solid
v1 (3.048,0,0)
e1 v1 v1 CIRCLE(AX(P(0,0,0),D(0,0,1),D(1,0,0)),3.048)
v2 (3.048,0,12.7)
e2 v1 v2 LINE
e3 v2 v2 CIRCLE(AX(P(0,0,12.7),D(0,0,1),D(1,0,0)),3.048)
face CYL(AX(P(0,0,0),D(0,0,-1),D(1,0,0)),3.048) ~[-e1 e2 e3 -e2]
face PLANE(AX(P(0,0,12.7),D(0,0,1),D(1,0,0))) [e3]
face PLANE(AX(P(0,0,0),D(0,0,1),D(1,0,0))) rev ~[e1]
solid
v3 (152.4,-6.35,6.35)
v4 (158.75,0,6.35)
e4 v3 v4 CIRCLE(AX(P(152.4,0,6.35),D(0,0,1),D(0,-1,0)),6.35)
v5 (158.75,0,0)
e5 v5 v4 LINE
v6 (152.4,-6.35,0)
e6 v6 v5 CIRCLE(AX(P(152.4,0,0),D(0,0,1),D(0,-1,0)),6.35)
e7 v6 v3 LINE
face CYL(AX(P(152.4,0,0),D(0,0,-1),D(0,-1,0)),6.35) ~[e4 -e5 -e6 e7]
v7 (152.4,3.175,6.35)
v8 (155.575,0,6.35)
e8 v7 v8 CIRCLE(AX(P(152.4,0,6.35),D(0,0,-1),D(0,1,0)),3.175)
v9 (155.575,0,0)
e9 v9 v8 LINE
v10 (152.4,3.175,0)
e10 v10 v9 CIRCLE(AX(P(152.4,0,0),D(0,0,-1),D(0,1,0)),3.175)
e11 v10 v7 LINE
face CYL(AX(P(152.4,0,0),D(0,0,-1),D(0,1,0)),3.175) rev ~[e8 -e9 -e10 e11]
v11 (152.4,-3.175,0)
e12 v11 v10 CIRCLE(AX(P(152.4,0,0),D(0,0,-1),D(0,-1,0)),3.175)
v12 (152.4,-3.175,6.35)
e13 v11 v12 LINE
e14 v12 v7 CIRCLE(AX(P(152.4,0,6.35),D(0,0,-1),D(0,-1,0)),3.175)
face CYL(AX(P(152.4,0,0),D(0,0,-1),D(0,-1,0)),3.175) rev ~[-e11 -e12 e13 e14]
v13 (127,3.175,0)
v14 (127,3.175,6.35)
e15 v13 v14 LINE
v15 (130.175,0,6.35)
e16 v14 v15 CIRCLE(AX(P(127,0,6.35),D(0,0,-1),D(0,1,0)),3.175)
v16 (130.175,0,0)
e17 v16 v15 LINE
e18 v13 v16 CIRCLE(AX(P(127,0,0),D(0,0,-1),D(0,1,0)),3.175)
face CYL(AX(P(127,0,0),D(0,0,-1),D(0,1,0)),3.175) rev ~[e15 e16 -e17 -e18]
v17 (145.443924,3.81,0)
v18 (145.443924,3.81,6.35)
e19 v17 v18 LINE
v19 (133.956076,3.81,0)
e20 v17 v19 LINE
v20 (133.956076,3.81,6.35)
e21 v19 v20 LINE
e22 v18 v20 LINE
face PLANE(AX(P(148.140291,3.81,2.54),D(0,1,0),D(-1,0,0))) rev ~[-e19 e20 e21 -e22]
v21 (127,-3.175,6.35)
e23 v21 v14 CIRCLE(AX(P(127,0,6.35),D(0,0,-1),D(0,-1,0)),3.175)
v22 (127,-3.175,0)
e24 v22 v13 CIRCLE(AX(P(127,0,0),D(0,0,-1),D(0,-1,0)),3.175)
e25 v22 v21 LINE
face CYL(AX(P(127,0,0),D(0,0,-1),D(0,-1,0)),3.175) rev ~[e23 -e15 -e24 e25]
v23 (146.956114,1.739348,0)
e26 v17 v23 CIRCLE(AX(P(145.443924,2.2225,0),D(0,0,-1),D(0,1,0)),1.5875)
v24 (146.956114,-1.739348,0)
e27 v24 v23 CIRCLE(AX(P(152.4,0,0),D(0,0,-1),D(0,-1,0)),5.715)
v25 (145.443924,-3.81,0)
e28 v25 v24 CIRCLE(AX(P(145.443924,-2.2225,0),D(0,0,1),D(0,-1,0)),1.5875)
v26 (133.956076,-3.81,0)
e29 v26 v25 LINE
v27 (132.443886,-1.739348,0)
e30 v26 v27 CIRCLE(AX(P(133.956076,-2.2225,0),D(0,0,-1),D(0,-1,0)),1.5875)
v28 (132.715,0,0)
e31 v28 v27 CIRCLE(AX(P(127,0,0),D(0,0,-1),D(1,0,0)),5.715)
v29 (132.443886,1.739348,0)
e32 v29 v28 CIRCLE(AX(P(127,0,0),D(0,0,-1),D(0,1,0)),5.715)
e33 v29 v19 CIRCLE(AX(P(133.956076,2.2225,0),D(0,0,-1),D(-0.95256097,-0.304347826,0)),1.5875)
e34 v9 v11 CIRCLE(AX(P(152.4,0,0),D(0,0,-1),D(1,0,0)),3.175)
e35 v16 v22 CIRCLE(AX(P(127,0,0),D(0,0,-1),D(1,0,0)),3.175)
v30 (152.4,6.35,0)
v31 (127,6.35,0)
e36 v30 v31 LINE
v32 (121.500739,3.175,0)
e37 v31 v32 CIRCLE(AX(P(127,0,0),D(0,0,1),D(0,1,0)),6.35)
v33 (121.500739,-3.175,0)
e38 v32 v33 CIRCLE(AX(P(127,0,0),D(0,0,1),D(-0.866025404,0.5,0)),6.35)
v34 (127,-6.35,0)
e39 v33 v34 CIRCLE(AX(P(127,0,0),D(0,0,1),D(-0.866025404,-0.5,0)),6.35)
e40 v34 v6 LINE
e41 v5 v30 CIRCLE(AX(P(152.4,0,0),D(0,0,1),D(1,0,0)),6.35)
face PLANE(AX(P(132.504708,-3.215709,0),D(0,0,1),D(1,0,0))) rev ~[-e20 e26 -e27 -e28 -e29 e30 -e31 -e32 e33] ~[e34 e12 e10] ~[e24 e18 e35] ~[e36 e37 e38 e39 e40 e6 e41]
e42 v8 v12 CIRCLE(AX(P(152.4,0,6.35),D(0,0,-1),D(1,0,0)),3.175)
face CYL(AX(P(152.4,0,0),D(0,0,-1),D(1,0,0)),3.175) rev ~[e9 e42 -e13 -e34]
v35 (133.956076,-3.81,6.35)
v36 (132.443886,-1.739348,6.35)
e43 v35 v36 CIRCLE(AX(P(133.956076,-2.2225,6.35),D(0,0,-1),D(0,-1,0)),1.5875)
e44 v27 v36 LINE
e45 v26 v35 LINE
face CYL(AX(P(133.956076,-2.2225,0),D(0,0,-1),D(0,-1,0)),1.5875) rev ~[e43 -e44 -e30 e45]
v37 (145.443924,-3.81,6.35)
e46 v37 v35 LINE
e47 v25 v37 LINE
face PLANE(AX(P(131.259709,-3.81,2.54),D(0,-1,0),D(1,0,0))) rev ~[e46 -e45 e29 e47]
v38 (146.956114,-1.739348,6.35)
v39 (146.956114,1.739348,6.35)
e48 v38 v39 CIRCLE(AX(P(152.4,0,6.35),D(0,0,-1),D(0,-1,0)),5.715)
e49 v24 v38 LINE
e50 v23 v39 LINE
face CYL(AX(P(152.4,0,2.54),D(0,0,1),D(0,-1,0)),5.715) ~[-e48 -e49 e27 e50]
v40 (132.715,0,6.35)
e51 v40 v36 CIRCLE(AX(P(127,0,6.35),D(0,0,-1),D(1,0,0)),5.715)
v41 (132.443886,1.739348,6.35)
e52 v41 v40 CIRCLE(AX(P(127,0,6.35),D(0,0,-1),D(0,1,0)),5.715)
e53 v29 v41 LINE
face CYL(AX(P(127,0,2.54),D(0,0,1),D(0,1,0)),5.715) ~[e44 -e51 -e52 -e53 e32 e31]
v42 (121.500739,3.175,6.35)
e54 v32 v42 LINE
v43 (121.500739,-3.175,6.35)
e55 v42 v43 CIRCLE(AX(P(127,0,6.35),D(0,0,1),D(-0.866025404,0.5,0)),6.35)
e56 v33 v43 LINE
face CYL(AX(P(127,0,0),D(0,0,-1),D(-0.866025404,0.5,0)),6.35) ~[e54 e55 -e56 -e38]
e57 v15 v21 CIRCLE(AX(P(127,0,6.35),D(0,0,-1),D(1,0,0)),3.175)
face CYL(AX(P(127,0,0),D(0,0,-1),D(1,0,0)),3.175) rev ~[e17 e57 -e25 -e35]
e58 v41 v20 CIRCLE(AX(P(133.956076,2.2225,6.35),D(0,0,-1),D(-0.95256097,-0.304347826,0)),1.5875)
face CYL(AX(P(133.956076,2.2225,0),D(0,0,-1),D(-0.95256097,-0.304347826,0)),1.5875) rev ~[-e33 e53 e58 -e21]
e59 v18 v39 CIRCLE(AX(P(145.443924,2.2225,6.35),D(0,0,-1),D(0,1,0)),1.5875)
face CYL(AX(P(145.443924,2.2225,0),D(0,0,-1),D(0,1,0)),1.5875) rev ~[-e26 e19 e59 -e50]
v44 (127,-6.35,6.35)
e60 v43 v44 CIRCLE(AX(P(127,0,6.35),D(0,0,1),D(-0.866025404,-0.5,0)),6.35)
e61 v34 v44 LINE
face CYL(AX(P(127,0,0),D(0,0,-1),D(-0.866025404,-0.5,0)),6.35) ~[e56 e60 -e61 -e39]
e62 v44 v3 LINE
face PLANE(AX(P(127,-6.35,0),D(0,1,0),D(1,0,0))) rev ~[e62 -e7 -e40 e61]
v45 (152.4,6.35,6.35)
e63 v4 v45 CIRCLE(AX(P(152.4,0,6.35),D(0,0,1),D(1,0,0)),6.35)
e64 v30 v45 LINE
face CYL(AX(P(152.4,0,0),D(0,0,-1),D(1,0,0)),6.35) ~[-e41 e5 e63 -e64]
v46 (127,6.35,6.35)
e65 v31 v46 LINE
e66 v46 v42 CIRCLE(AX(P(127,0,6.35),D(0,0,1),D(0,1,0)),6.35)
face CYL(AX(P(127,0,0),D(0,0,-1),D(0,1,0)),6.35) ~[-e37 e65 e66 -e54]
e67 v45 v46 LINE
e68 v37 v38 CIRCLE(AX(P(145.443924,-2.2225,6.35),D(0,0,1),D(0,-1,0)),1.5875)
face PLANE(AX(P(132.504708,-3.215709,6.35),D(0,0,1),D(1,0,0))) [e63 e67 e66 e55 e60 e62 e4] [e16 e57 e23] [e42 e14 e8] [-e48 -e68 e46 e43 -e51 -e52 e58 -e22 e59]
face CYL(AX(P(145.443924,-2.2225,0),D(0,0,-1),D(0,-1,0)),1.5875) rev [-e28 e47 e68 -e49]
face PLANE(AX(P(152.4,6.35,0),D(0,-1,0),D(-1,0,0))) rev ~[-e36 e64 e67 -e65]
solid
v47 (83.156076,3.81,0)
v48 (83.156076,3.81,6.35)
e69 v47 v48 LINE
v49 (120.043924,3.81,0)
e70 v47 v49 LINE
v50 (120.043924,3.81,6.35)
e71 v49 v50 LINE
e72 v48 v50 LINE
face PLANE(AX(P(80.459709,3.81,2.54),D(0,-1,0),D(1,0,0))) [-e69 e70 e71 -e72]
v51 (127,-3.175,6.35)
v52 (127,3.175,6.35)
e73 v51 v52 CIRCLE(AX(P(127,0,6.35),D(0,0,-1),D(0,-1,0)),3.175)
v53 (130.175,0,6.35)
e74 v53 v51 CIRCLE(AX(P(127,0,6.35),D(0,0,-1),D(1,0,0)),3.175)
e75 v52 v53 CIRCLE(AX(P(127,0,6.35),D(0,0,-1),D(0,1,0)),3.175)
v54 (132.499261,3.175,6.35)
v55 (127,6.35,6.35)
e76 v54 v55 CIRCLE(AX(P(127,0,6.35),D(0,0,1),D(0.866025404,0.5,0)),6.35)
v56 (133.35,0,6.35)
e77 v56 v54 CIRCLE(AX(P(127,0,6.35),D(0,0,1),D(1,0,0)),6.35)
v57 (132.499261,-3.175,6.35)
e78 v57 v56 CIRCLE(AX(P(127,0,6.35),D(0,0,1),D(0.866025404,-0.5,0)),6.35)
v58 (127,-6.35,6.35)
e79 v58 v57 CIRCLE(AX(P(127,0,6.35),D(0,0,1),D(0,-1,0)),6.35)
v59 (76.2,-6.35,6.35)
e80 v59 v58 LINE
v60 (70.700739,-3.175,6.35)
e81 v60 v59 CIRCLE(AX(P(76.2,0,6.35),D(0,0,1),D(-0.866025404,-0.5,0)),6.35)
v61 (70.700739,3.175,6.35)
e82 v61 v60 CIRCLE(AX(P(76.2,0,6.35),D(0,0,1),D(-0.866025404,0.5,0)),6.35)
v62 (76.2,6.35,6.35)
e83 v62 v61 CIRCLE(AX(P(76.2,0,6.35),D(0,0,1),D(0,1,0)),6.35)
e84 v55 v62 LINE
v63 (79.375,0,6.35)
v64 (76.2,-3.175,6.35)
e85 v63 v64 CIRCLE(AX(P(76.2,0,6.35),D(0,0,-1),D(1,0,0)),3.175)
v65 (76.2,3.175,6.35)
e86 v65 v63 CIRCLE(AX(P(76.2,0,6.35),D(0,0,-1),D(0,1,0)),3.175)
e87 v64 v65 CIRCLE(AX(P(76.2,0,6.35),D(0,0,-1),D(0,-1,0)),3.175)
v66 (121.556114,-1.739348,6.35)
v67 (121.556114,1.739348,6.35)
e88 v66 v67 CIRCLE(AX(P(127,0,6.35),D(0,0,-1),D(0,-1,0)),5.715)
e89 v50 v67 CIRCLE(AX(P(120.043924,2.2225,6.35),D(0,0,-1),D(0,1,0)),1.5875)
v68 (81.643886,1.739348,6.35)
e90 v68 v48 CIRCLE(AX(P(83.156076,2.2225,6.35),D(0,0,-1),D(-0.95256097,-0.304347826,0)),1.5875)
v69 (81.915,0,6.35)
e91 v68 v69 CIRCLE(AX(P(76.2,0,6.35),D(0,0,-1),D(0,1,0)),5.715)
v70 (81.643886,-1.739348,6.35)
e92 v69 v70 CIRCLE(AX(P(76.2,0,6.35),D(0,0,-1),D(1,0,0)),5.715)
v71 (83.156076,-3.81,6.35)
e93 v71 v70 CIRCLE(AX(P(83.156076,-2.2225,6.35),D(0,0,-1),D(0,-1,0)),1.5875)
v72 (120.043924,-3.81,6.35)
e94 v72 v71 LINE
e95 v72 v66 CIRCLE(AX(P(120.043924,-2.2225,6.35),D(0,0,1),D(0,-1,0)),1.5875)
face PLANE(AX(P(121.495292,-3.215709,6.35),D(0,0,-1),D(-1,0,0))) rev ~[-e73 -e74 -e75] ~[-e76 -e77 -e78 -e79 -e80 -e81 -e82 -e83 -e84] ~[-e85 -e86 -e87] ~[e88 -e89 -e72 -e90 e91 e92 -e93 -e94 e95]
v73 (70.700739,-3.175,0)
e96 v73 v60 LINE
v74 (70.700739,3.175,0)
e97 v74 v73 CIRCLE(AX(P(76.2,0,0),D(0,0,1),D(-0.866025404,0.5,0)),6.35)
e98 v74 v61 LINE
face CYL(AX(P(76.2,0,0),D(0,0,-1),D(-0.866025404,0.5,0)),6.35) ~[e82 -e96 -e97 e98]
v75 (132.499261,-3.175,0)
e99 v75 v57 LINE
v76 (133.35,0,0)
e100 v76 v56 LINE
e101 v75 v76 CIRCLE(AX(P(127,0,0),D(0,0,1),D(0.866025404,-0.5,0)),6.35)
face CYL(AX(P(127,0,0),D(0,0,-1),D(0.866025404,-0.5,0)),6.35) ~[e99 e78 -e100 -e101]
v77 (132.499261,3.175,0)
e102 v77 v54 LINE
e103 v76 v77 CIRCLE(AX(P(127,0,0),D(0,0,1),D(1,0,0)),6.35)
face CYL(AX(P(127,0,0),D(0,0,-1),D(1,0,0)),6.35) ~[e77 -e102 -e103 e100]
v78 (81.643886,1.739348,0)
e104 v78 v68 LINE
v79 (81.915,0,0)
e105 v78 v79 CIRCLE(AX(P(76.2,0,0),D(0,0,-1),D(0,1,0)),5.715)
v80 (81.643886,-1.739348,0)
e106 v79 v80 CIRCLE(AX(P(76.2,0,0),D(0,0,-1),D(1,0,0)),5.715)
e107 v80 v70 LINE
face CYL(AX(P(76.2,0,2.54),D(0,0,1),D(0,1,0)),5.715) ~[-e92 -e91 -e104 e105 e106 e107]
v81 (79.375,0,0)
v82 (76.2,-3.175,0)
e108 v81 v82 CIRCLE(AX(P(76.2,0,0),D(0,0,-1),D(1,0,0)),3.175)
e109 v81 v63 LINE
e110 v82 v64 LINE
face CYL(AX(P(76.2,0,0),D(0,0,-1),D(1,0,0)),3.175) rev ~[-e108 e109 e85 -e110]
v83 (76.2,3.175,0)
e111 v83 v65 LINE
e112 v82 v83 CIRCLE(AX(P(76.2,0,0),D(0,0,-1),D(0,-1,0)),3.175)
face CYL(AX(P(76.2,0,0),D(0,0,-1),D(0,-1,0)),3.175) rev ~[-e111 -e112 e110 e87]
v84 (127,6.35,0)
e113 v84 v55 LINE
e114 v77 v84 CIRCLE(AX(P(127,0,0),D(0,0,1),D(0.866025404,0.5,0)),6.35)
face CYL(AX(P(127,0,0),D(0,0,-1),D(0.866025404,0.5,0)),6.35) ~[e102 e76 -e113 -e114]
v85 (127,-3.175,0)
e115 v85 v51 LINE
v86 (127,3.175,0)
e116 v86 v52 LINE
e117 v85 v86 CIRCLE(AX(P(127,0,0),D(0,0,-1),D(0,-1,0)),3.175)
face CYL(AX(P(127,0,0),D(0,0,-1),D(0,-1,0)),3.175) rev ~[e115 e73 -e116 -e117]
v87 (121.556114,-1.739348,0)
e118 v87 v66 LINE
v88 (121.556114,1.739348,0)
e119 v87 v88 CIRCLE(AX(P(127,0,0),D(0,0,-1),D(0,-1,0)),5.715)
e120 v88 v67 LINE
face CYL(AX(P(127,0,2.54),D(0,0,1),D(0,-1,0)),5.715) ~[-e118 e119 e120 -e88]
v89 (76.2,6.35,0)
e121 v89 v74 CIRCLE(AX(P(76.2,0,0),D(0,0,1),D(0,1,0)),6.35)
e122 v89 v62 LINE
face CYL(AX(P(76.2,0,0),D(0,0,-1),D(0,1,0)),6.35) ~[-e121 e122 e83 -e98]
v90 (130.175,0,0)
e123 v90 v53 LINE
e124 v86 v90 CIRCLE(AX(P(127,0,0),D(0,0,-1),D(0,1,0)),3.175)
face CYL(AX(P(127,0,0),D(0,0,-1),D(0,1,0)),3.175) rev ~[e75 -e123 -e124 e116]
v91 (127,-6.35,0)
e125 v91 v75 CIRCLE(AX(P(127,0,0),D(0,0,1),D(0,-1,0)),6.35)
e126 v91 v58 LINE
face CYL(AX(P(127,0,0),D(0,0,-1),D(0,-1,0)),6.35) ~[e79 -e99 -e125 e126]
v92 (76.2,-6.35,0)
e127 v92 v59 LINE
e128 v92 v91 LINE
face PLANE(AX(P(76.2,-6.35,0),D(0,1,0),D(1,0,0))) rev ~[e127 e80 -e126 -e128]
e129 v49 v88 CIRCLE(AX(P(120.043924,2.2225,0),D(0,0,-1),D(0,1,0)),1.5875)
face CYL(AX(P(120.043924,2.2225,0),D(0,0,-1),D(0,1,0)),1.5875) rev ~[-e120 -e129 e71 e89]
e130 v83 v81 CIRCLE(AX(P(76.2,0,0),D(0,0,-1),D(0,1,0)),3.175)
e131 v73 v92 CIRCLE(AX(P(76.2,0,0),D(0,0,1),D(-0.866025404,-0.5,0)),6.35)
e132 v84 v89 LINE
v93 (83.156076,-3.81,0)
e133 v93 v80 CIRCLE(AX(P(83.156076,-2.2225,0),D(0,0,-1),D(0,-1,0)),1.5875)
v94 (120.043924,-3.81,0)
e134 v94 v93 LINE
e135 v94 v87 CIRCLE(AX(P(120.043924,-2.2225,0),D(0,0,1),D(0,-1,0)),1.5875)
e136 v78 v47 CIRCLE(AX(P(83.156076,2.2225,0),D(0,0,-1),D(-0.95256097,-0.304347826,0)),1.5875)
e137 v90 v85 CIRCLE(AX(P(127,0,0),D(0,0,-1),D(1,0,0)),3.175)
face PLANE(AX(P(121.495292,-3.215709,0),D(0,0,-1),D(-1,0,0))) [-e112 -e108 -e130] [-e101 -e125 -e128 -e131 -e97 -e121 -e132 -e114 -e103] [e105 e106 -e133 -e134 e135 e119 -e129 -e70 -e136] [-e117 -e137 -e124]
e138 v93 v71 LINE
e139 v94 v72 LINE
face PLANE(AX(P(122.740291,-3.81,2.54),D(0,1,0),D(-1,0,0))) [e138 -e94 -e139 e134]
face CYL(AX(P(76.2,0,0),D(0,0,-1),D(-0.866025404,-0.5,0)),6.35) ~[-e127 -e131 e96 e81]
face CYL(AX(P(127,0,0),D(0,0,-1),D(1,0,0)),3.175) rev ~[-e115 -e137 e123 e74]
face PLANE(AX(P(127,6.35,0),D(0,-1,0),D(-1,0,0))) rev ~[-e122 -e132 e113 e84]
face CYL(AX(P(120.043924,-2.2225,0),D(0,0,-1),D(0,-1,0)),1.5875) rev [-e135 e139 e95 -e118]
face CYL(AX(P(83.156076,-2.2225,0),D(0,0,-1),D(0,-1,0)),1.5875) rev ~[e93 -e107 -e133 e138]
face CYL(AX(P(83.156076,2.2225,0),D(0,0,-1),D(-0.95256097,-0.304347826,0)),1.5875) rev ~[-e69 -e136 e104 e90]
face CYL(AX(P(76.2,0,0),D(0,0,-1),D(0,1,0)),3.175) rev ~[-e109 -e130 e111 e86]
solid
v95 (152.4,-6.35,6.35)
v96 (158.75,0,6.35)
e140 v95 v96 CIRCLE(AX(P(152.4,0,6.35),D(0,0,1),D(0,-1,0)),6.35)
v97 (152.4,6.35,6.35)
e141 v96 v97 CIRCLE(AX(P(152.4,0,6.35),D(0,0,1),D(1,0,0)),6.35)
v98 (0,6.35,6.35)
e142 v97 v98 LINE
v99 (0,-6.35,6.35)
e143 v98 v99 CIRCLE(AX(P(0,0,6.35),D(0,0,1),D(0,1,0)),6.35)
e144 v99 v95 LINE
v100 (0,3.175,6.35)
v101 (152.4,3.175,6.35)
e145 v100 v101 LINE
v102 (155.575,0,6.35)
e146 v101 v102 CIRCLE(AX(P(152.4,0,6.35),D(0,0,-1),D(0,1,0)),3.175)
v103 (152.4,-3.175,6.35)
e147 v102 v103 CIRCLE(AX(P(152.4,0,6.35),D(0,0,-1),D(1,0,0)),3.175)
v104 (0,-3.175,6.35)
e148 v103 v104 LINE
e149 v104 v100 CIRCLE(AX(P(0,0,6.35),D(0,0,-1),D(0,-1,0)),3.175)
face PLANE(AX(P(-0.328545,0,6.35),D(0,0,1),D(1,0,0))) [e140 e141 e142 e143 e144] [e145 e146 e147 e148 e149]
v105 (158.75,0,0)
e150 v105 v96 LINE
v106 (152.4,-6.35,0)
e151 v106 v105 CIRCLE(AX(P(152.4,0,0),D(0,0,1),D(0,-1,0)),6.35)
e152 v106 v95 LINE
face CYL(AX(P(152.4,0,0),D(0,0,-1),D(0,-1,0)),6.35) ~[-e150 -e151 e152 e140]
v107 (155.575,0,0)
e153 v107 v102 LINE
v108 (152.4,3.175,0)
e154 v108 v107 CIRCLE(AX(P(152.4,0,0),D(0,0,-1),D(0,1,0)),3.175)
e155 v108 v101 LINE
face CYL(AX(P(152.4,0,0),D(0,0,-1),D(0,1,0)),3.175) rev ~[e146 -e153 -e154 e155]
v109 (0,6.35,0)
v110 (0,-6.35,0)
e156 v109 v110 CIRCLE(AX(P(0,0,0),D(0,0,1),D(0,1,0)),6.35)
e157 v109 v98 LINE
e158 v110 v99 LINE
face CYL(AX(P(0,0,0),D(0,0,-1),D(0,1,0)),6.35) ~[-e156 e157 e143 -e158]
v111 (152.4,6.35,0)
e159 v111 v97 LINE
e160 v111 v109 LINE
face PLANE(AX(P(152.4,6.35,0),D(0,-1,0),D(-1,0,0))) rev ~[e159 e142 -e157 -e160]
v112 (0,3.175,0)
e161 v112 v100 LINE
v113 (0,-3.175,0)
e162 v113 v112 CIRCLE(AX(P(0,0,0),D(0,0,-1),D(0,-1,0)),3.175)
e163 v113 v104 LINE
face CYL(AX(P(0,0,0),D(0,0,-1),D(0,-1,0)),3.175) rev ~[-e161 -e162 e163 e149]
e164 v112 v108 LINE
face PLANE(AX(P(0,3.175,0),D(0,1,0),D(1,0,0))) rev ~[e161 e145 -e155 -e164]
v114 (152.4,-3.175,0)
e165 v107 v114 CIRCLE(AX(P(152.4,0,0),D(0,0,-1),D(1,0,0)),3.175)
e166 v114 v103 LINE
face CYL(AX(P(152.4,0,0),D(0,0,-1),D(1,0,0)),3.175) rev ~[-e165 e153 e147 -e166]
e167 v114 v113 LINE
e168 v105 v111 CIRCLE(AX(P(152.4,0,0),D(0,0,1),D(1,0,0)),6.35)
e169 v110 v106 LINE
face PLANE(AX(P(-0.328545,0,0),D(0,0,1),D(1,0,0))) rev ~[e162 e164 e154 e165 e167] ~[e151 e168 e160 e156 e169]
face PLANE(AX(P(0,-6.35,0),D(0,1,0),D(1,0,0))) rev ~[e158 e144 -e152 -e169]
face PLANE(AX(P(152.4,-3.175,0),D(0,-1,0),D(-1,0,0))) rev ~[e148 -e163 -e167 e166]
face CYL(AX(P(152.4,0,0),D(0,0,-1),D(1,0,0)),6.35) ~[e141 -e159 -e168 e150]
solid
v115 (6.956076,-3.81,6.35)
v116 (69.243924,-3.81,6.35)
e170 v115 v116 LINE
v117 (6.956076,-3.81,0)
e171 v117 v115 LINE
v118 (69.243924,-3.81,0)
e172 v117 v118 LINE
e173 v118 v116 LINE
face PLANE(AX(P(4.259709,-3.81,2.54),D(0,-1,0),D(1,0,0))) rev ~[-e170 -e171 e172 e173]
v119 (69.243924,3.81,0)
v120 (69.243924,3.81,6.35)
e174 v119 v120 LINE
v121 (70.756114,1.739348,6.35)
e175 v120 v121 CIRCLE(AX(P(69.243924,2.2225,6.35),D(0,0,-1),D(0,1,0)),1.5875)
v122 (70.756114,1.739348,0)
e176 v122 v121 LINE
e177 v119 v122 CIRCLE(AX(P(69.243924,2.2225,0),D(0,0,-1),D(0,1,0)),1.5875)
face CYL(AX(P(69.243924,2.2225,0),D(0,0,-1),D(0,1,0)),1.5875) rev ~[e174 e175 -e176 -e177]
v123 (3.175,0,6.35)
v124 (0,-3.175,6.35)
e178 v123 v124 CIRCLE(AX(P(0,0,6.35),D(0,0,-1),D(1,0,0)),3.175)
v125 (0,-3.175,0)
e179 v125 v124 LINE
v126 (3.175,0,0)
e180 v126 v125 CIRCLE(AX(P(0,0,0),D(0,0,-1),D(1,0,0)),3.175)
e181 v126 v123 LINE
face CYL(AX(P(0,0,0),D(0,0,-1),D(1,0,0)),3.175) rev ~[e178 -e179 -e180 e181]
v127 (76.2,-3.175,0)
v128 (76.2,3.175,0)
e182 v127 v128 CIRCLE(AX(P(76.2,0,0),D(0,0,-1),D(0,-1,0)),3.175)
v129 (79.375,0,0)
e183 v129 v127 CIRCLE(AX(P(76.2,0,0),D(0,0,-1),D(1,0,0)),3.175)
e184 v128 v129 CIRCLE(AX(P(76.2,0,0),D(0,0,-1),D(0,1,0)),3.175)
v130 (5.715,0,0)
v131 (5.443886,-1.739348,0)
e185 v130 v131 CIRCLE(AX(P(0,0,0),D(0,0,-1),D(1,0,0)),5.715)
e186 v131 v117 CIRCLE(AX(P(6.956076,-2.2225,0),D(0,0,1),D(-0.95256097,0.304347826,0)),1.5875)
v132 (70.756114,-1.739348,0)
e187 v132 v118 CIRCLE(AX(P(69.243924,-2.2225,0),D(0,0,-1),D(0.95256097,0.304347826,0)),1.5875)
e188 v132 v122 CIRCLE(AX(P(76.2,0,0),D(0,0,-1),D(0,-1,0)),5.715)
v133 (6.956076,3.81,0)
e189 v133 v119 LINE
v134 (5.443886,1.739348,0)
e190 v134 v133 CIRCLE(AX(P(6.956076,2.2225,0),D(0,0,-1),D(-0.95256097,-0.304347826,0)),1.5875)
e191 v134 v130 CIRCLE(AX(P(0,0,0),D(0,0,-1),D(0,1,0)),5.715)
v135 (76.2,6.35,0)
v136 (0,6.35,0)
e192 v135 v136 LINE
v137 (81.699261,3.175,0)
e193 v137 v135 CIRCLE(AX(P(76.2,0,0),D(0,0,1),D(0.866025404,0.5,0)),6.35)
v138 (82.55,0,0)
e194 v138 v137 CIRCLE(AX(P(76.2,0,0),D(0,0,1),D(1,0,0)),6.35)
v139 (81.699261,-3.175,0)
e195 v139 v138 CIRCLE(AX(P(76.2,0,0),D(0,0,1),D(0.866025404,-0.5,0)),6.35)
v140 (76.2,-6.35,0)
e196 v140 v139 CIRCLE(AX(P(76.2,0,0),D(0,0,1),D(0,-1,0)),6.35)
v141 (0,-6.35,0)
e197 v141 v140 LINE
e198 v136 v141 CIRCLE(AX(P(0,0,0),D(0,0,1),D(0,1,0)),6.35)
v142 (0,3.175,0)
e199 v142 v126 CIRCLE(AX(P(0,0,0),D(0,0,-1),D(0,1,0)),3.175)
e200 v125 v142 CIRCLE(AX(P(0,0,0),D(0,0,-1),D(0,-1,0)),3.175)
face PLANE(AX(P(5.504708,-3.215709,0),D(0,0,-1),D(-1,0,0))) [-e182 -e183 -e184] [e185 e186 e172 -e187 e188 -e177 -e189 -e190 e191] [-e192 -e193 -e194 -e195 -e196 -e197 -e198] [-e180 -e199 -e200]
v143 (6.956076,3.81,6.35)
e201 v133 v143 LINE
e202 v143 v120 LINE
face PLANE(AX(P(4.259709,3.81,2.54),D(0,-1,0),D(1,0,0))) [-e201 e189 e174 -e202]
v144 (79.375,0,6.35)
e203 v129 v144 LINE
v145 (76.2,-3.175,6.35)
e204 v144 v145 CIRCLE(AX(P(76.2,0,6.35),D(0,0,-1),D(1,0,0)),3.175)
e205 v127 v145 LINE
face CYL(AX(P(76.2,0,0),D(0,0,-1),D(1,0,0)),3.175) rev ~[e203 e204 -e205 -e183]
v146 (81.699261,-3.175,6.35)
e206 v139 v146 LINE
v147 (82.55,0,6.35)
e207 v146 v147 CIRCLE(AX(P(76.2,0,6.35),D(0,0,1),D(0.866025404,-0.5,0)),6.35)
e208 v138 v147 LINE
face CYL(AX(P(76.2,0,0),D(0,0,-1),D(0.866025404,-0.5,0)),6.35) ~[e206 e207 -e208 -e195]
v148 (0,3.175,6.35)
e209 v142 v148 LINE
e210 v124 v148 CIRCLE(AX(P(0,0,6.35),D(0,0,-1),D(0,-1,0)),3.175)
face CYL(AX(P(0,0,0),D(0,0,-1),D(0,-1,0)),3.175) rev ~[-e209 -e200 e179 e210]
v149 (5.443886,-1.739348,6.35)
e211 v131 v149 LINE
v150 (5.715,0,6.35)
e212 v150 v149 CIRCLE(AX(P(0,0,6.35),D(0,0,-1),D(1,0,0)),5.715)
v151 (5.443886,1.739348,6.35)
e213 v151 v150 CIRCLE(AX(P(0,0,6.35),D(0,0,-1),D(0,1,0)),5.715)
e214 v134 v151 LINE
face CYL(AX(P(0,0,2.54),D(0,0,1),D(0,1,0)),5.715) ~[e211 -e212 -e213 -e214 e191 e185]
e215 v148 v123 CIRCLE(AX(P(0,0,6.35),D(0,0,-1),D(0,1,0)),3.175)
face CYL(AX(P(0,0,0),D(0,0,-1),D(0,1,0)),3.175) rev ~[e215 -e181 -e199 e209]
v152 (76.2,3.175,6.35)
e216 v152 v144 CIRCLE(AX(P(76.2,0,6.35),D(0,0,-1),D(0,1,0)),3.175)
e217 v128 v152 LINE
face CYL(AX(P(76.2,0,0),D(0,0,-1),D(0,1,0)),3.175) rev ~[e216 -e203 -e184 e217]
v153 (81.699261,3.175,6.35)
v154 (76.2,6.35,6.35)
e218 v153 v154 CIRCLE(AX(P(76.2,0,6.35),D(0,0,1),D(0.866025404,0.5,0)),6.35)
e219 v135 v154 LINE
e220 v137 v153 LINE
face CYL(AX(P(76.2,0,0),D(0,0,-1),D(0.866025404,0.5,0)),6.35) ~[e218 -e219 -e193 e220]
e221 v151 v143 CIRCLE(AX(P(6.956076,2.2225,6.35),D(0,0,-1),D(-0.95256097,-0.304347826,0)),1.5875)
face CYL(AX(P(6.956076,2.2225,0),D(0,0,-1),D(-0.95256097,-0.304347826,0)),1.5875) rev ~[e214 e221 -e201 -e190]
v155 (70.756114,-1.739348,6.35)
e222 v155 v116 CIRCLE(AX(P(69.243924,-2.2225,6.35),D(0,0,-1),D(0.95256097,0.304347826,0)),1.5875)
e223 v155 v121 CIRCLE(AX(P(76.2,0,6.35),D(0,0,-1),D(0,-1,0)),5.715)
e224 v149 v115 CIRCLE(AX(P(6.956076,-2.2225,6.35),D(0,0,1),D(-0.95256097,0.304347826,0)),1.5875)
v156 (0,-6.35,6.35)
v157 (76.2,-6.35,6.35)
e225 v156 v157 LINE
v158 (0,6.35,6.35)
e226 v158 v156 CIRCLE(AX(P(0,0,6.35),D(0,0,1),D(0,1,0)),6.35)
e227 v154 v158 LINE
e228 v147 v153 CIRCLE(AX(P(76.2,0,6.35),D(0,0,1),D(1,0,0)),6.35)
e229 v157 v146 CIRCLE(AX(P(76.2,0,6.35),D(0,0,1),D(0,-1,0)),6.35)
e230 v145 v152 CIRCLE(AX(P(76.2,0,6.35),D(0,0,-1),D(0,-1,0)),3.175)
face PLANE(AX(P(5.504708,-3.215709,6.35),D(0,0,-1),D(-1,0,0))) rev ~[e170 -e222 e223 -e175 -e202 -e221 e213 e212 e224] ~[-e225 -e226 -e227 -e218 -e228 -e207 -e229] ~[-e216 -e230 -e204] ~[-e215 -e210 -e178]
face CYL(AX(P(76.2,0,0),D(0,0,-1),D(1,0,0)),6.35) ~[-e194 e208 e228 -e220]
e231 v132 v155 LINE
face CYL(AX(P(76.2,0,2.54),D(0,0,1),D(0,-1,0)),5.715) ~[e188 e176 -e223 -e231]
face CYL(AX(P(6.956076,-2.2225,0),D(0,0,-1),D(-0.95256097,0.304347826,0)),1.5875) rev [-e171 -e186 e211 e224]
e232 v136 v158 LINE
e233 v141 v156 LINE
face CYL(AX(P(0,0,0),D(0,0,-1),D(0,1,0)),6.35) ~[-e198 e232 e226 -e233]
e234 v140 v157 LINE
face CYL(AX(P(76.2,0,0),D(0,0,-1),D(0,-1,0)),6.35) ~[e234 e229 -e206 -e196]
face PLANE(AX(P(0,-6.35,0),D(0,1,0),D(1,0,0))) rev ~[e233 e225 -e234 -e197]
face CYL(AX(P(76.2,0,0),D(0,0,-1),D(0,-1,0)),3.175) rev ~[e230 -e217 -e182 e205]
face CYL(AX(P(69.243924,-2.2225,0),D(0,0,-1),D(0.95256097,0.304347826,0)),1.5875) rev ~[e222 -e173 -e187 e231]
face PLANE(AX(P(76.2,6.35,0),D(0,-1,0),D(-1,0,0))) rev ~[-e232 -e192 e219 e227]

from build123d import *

# Parameters (mm, degrees)
F1_DEPTH      = 6.35
F2_DEPTH      = 6.35
F3_DEPTH      = 6.35
F4_DEPTH      = 6.35
F0_R          = 3.048
F5_DEPTH      = 12.7
F6_T          = -2.54
F7_T          = -2.54
F8_T          = -2.54
F9_T1_DEPTH   = 6.35
F9_2_T1_DEPTH = 6.35
F9_3_T1_DEPTH = 6.35


# Not quite as in the source:
# - a fillet or chamfer that OpenCascade refuses, or shapes differently, is made with other operations: its cross-section is extruded or revolved along the edge and cut away or added
# - two fillets or chamfers of one size are made in one step


with BuildPart() as f1:
    # F0 (on Top) → F1 (new body)
    with BuildSketch(Plane.XY):
        with BuildLine():
            ThreePointArc((0, 6.35), (3.175, 5.499261314), (5.499261314, 3.175))
            Line((5.499261314, 3.175), (70.700738686, 3.175))
            ThreePointArc((70.700738686, 3.175), (73.025, 5.499261314), (76.2, 6.35))
            Line((76.2, 6.35), (0, 6.35))
        make_face()
        with BuildLine():
            Line((76.2, 3.175), (70.700738686, 3.175))
            ThreePointArc((70.700738686, 3.175), (69.85, 0), (70.700738686, -3.175))
            Line((70.700738686, -3.175), (76.2, -3.175))
            ThreePointArc((76.2, -3.175), (73.025, 0), (76.2, 3.175))
        make_face()
        with BuildLine():
            Line((81.699261314, 3.175), (76.2, 3.175))
            ThreePointArc((76.2, 3.175), (78.4450640303, 2.2450640303), (79.375, 0))
            ThreePointArc((79.375, 0), (78.4450640303, -2.2450640303), (76.2, -3.175))
            Line((76.2, -3.175), (81.699261314, -3.175))
            ThreePointArc((81.699261314, -3.175), (82.3336289969, -1.6435009364), (82.55, 0))
            ThreePointArc((82.55, 0), (82.3336289969, 1.6435009364), (81.699261314, 3.175))
        make_face()
        with BuildLine():
            ThreePointArc((0, -3.175), (-3.175, 0), (0, 3.175))
            Line((0, 3.175), (5.499261314, 3.175))
            ThreePointArc((5.499261314, 3.175), (3.175, 5.499261314), (0, 6.35))
            ThreePointArc((0, 6.35), (-6.35, 0), (0, -6.35))
            ThreePointArc((0, -6.35), (3.175, -5.499261314), (5.499261314, -3.175))
            Line((5.499261314, -3.175), (0, -3.175))
        make_face()
        with BuildLine():
            ThreePointArc((0, 3.175), (2.2450640303, 2.2450640303), (3.175, 0))
            ThreePointArc((3.175, 0), (2.2450640303, -2.2450640303), (0, -3.175))
            Line((0, -3.175), (5.499261314, -3.175))
            ThreePointArc((5.499261314, -3.175), (6.1336289969, -1.6435009364), (6.35, 0))
            ThreePointArc((6.35, 0), (6.1336289969, 1.6435009364), (5.499261314, 3.175))
            Line((5.499261314, 3.175), (0, 3.175))
        make_face()
        with BuildLine():
            Line((70.700738686, 3.175), (5.499261314, 3.175))
            ThreePointArc((5.499261314, 3.175), (6.1336289969, 1.6435009364), (6.35, 0))
            ThreePointArc((6.35, 0), (6.1336289969, -1.6435009364), (5.499261314, -3.175))
            Line((5.499261314, -3.175), (70.700738686, -3.175))
            ThreePointArc((70.700738686, -3.175), (69.85, 0), (70.700738686, 3.175))
        make_face()
        with BuildLine():
            Line((70.700738686, -3.175), (5.499261314, -3.175))
            ThreePointArc((5.499261314, -3.175), (3.175, -5.499261314), (0, -6.35))
            Line((0, -6.35), (76.2, -6.35))
            ThreePointArc((76.2, -6.35), (73.025, -5.499261314), (70.700738686, -3.175))
        make_face()
        with BuildLine():
            ThreePointArc((76.2, 6.35), (73.025, 5.499261314), (70.700738686, 3.175))
            Line((70.700738686, 3.175), (76.2, 3.175))
            Line((76.2, 3.175), (81.699261314, 3.175))
            ThreePointArc((81.699261314, 3.175), (79.375, 5.499261314), (76.2, 6.35))
        make_face()
        with BuildLine():
            Line((76.2, -3.175), (70.700738686, -3.175))
            ThreePointArc((70.700738686, -3.175), (73.025, -5.499261314), (76.2, -6.35))
            ThreePointArc((76.2, -6.35), (79.375, -5.499261314), (81.699261314, -3.175))
            Line((81.699261314, -3.175), (76.2, -3.175))
        make_face()
    extrude(amount=F1_DEPTH)

    # F6: a shell. OpenCascade refuses it in one call, so the cavity is built on its own and cut out:
    # the body offset inwards by the wall thickness, plus a prism from it out through each open face.
    f6_core = offset(f1.part, amount=F6_T, mode=Mode.PRIVATE)
    f6_exits = [f6_core.faces().sort_by_distance(p)[0] for p in [
        (38.1, 0, 3.81),
        (38.1, 0, 2.54),
    ]]
    add(f6_core, mode=Mode.SUBTRACT)
    extrude(f6_exits, amount=-F6_T, mode=Mode.SUBTRACT)

    # F9: fillet of radius 1.5875 on 4 edges, made by hand

    # F9_s2 → F9_t1 (join)
    with BuildSketch(Plane.XY):
        with BuildLine():
            ThreePointArc((5.4438859411, -1.7393478261), (5.674054576, -3.1587564216), (6.9560764803, -3.81))
            Line((6.9560764803, -3.81), (4.2597094971, -3.81))
            ThreePointArc((4.2597094971, -3.81), (4.961032273, -2.8371435964), (5.4438859411, -1.7393478261))
        make_face()
        with BuildLine():
            ThreePointArc((5.4438859411, 1.7393478261), (5.674054576, 3.1587564216), (6.9560764803, 3.81))
            Line((6.9560764803, 3.81), (4.2597094971, 3.81))
            ThreePointArc((4.2597094971, 3.81), (4.961032273, 2.8371435964), (5.4438859411, 1.7393478261))
        make_face()
        with BuildLine():
            ThreePointArc((69.2439235197, 3.81), (70.525945424, 3.1587564216), (70.7561140589, 1.7393478261))
            ThreePointArc((70.7561140589, 1.7393478261), (71.238967727, 2.8371435964), (71.9402905029, 3.81))
            Line((71.9402905029, 3.81), (69.2439235197, 3.81))
        make_face()
        with BuildLine():
            ThreePointArc((70.7561140589, -1.7393478261), (70.525945424, -3.1587564216), (69.2439235197, -3.81))
            Line((69.2439235197, -3.81), (71.9402905029, -3.81))
            ThreePointArc((71.9402905029, -3.81), (71.238967727, -2.8371435964), (70.7561140589, -1.7393478261))
        make_face()
    extrude(amount=F9_T1_DEPTH)


with BuildPart() as f2:
    # F0 (on Top) → F2 (new body)
    with BuildSketch(Plane.XY):
        with BuildLine():
            Line((127, 6.35), (76.2, 6.35))
            ThreePointArc((76.2, 6.35), (79.375, 5.499261314), (81.699261314, 3.175))
            Line((81.699261314, 3.175), (121.500738686, 3.175))
            ThreePointArc((121.500738686, 3.175), (123.825, 5.499261314), (127, 6.35))
        make_face()
        with BuildLine():
            Line((121.500738686, 3.175), (81.699261314, 3.175))
            ThreePointArc((81.699261314, 3.175), (82.3336289969, 1.6435009364), (82.55, 0))
            ThreePointArc((82.55, 0), (82.3336289969, -1.6435009364), (81.699261314, -3.175))
            Line((81.699261314, -3.175), (121.500738686, -3.175))
            ThreePointArc((121.500738686, -3.175), (120.65, 0), (121.500738686, 3.175))
        make_face()
        with BuildLine():
            ThreePointArc((81.699261314, -3.175), (79.375, -5.499261314), (76.2, -6.35))
            Line((76.2, -6.35), (127, -6.35))
            ThreePointArc((127, -6.35), (123.825, -5.499261314), (121.500738686, -3.175))
            Line((121.500738686, -3.175), (81.699261314, -3.175))
        make_face()
        with BuildLine():
            Line((127, 3.175), (121.500738686, 3.175))
            ThreePointArc((121.500738686, 3.175), (120.65, 0), (121.500738686, -3.175))
            Line((121.500738686, -3.175), (127, -3.175))
            ThreePointArc((127, -3.175), (123.825, 0), (127, 3.175))
        make_face()
        with BuildLine():
            ThreePointArc((132.499261314, 3.175), (130.175, 5.499261314), (127, 6.35))
            ThreePointArc((127, 6.35), (123.825, 5.499261314), (121.500738686, 3.175))
            Line((121.500738686, 3.175), (127, 3.175))
            Line((127, 3.175), (132.499261314, 3.175))
        make_face()
        with BuildLine():
            ThreePointArc((133.35, 0), (133.1336289969, 1.6435009364), (132.499261314, 3.175))
            Line((132.499261314, 3.175), (127, 3.175))
            ThreePointArc((127, 3.175), (129.2450640303, 2.2450640303), (130.175, 0))
            ThreePointArc((130.175, 0), (129.2450640303, -2.2450640303), (127, -3.175))
            Line((127, -3.175), (132.499261314, -3.175))
            ThreePointArc((132.499261314, -3.175), (133.1336289969, -1.6435009364), (133.35, 0))
        make_face()
        with BuildLine():
            ThreePointArc((121.500738686, -3.175), (123.825, -5.499261314), (127, -6.35))
            ThreePointArc((127, -6.35), (130.175, -5.499261314), (132.499261314, -3.175))
            Line((132.499261314, -3.175), (127, -3.175))
            Line((127, -3.175), (121.500738686, -3.175))
        make_face()
        with BuildLine():
            ThreePointArc((76.2, 6.35), (73.025, 5.499261314), (70.700738686, 3.175))
            Line((70.700738686, 3.175), (76.2, 3.175))
            Line((76.2, 3.175), (81.699261314, 3.175))
            ThreePointArc((81.699261314, 3.175), (79.375, 5.499261314), (76.2, 6.35))
        make_face()
        with BuildLine():
            Line((76.2, 3.175), (70.700738686, 3.175))
            ThreePointArc((70.700738686, 3.175), (69.85, 0), (70.700738686, -3.175))
            Line((70.700738686, -3.175), (76.2, -3.175))
            ThreePointArc((76.2, -3.175), (73.025, 0), (76.2, 3.175))
        make_face()
        with BuildLine():
            Line((81.699261314, 3.175), (76.2, 3.175))
            ThreePointArc((76.2, 3.175), (78.4450640303, 2.2450640303), (79.375, 0))
            ThreePointArc((79.375, 0), (78.4450640303, -2.2450640303), (76.2, -3.175))
            Line((76.2, -3.175), (81.699261314, -3.175))
            ThreePointArc((81.699261314, -3.175), (82.3336289969, -1.6435009364), (82.55, 0))
            ThreePointArc((82.55, 0), (82.3336289969, 1.6435009364), (81.699261314, 3.175))
        make_face()
        with BuildLine():
            Line((76.2, -3.175), (70.700738686, -3.175))
            ThreePointArc((70.700738686, -3.175), (73.025, -5.499261314), (76.2, -6.35))
            ThreePointArc((76.2, -6.35), (79.375, -5.499261314), (81.699261314, -3.175))
            Line((81.699261314, -3.175), (76.2, -3.175))
        make_face()
    extrude(amount=F2_DEPTH)

    # F7: a shell. OpenCascade refuses it in one call, so the cavity is built on its own and cut out:
    # the body offset inwards by the wall thickness, plus a prism from it out through each open face.
    f7_core = offset(f2.part, amount=F7_T, mode=Mode.PRIVATE)
    f7_exits = [f7_core.faces().sort_by_distance(p)[0] for p in [
        (101.6, 0, 3.81),
        (101.6, 0, 2.54),
    ]]
    add(f7_core, mode=Mode.SUBTRACT)
    extrude(f7_exits, amount=-F7_T, mode=Mode.SUBTRACT)

    # F9#2: fillet of radius 1.5875 on 4 edges, made by hand

    # F9_2_s2 → F9_2_t1 (join)
    with BuildSketch(Plane.XY):
        with BuildLine():
            ThreePointArc((120.0439235197, -3.81), (121.325945424, -3.1587564216), (121.5561140589, -1.7393478261))
            ThreePointArc((121.5561140589, -1.7393478261), (122.038967727, -2.8371435964), (122.7402905029, -3.81))
            Line((122.7402905029, -3.81), (120.0439235197, -3.81))
        make_face()
        with BuildLine():
            ThreePointArc((83.1560764803, -3.81), (81.874054576, -3.1587564216), (81.6438859411, -1.7393478261))
            ThreePointArc((81.6438859411, -1.7393478261), (81.161032273, -2.8371435964), (80.4597094971, -3.81))
            Line((80.4597094971, -3.81), (83.1560764803, -3.81))
        make_face()
        with BuildLine():
            ThreePointArc((81.6438859411, 1.7393478261), (81.874054576, 3.1587564216), (83.1560764803, 3.81))
            Line((83.1560764803, 3.81), (80.4597094971, 3.81))
            ThreePointArc((80.4597094971, 3.81), (81.161032273, 2.8371435964), (81.6438859411, 1.7393478261))
        make_face()
        with BuildLine():
            ThreePointArc((120.0439235197, 3.81), (121.325945424, 3.1587564216), (121.5561140589, 1.7393478261))
            ThreePointArc((121.5561140589, 1.7393478261), (122.038967727, 2.8371435964), (122.7402905029, 3.81))
            Line((122.7402905029, 3.81), (120.0439235197, 3.81))
        make_face()
    extrude(amount=F9_2_T1_DEPTH)


with BuildPart() as f3:
    # F0 (on Top) → F3 (new body)
    with BuildSketch(Plane.XY):
        with BuildLine():
            Line((152.4, 6.35), (127, 6.35))
            ThreePointArc((127, 6.35), (130.175, 5.499261314), (132.499261314, 3.175))
            Line((132.499261314, 3.175), (146.900738686, 3.175))
            ThreePointArc((146.900738686, 3.175), (149.225, 5.499261314), (152.4, 6.35))
        make_face()
        with BuildLine():
            Line((127, 3.175), (121.500738686, 3.175))
            ThreePointArc((121.500738686, 3.175), (120.65, 0), (121.500738686, -3.175))
            Line((121.500738686, -3.175), (127, -3.175))
            ThreePointArc((127, -3.175), (123.825, 0), (127, 3.175))
        make_face()
        with BuildLine():
            ThreePointArc((133.35, 0), (133.1336289969, 1.6435009364), (132.499261314, 3.175))
            Line((132.499261314, 3.175), (127, 3.175))
            ThreePointArc((127, 3.175), (129.2450640303, 2.2450640303), (130.175, 0))
            ThreePointArc((130.175, 0), (129.2450640303, -2.2450640303), (127, -3.175))
            Line((127, -3.175), (132.499261314, -3.175))
            ThreePointArc((132.499261314, -3.175), (133.1336289969, -1.6435009364), (133.35, 0))
        make_face()
        with BuildLine():
            Line((152.4, 3.175), (146.900738686, 3.175))
            ThreePointArc((146.900738686, 3.175), (146.05, 0), (146.900738686, -3.175))
            Line((146.900738686, -3.175), (152.4, -3.175))
            ThreePointArc((152.4, -3.175), (149.225, 0), (152.4, 3.175))
        make_face()
        with BuildLine():
            ThreePointArc((158.75, 0), (156.8901280605, 4.4901280605), (152.4, 6.35))
            ThreePointArc((152.4, 6.35), (149.225, 5.499261314), (146.900738686, 3.175))
            Line((146.900738686, 3.175), (152.4, 3.175))
            ThreePointArc((152.4, 3.175), (154.6450640303, 2.2450640303), (155.575, 0))
            ThreePointArc((155.575, 0), (154.6450640303, -2.2450640303), (152.4, -3.175))
            Line((152.4, -3.175), (146.900738686, -3.175))
            ThreePointArc((146.900738686, -3.175), (149.225, -5.499261314), (152.4, -6.35))
            ThreePointArc((152.4, -6.35), (156.8901280605, -4.4901280605), (158.75, 0))
        make_face()
        with BuildLine():
            Line((146.900738686, 3.175), (132.499261314, 3.175))
            ThreePointArc((132.499261314, 3.175), (133.1336289969, 1.6435009364), (133.35, 0))
            ThreePointArc((133.35, 0), (133.1336289969, -1.6435009364), (132.499261314, -3.175))
            Line((132.499261314, -3.175), (146.900738686, -3.175))
            ThreePointArc((146.900738686, -3.175), (146.05, 0), (146.900738686, 3.175))
        make_face()
        with BuildLine():
            ThreePointArc((132.499261314, -3.175), (130.175, -5.499261314), (127, -6.35))
            Line((127, -6.35), (152.4, -6.35))
            ThreePointArc((152.4, -6.35), (149.225, -5.499261314), (146.900738686, -3.175))
            Line((146.900738686, -3.175), (132.499261314, -3.175))
        make_face()
        with BuildLine():
            ThreePointArc((132.499261314, 3.175), (130.175, 5.499261314), (127, 6.35))
            ThreePointArc((127, 6.35), (123.825, 5.499261314), (121.500738686, 3.175))
            Line((121.500738686, 3.175), (127, 3.175))
            Line((127, 3.175), (132.499261314, 3.175))
        make_face()
        with BuildLine():
            ThreePointArc((121.500738686, -3.175), (123.825, -5.499261314), (127, -6.35))
            ThreePointArc((127, -6.35), (130.175, -5.499261314), (132.499261314, -3.175))
            Line((132.499261314, -3.175), (127, -3.175))
            Line((127, -3.175), (121.500738686, -3.175))
        make_face()
    extrude(amount=F3_DEPTH)

    # F8: a shell. OpenCascade refuses it in one call, so the cavity is built on its own and cut out:
    # the body offset inwards by the wall thickness, plus a prism from it out through each open face.
    f8_core = offset(f3.part, amount=F8_T, mode=Mode.PRIVATE)
    f8_exits = [f8_core.faces().sort_by_distance(p)[0] for p in [
        (139.7, 0, 3.81),
        (139.7, 0, 2.54),
    ]]
    add(f8_core, mode=Mode.SUBTRACT)
    extrude(f8_exits, amount=-F8_T, mode=Mode.SUBTRACT)

    # F9#3: fillet of radius 1.5875 on 4 edges, made by hand

    # F9_3_s2 → F9_3_t1 (join)
    with BuildSketch(Plane.XY):
        with BuildLine():
            ThreePointArc((133.9560764803, -3.81), (132.674054576, -3.1587564216), (132.4438859411, -1.7393478261))
            ThreePointArc((132.4438859411, -1.7393478261), (131.961032273, -2.8371435964), (131.2597094971, -3.81))
            Line((131.2597094971, -3.81), (133.9560764803, -3.81))
        make_face()
        with BuildLine():
            ThreePointArc((145.4439235197, -3.81), (146.725945424, -3.1587564216), (146.9561140589, -1.7393478261))
            ThreePointArc((146.9561140589, -1.7393478261), (147.438967727, -2.8371435964), (148.1402905029, -3.81))
            Line((148.1402905029, -3.81), (145.4439235197, -3.81))
        make_face()
        with BuildLine():
            ThreePointArc((132.4438859411, 1.7393478261), (132.674054576, 3.1587564216), (133.9560764803, 3.81))
            Line((133.9560764803, 3.81), (131.2597094971, 3.81))
            ThreePointArc((131.2597094971, 3.81), (131.961032273, 2.8371435964), (132.4438859411, 1.7393478261))
        make_face()
        with BuildLine():
            ThreePointArc((145.4439235197, 3.81), (146.725945424, 3.1587564216), (146.9561140589, 1.7393478261))
            ThreePointArc((146.9561140589, 1.7393478261), (147.438967727, 2.8371435964), (148.1402905029, 3.81))
            Line((148.1402905029, 3.81), (145.4439235197, 3.81))
        make_face()
    extrude(amount=F9_3_T1_DEPTH)


with BuildPart() as f4:
    # F0 (on Top) → F4 (new body)
    with BuildSketch(Plane.XY):
        with BuildLine():
            ThreePointArc((0, -3.175), (-3.175, 0), (0, 3.175))
            Line((0, 3.175), (5.499261314, 3.175))
            ThreePointArc((5.499261314, 3.175), (3.175, 5.499261314), (0, 6.35))
            ThreePointArc((0, 6.35), (-6.35, 0), (0, -6.35))
            ThreePointArc((0, -6.35), (3.175, -5.499261314), (5.499261314, -3.175))
            Line((5.499261314, -3.175), (0, -3.175))
        make_face()
        with BuildLine():
            ThreePointArc((0, 6.35), (3.175, 5.499261314), (5.499261314, 3.175))
            Line((5.499261314, 3.175), (70.700738686, 3.175))
            ThreePointArc((70.700738686, 3.175), (73.025, 5.499261314), (76.2, 6.35))
            Line((76.2, 6.35), (0, 6.35))
        make_face()
        with BuildLine():
            ThreePointArc((76.2, 6.35), (73.025, 5.499261314), (70.700738686, 3.175))
            Line((70.700738686, 3.175), (76.2, 3.175))
            Line((76.2, 3.175), (81.699261314, 3.175))
            ThreePointArc((81.699261314, 3.175), (79.375, 5.499261314), (76.2, 6.35))
        make_face()
        with BuildLine():
            Line((70.700738686, -3.175), (5.499261314, -3.175))
            ThreePointArc((5.499261314, -3.175), (3.175, -5.499261314), (0, -6.35))
            Line((0, -6.35), (76.2, -6.35))
            ThreePointArc((76.2, -6.35), (73.025, -5.499261314), (70.700738686, -3.175))
        make_face()
        with BuildLine():
            Line((76.2, -3.175), (70.700738686, -3.175))
            ThreePointArc((70.700738686, -3.175), (73.025, -5.499261314), (76.2, -6.35))
            ThreePointArc((76.2, -6.35), (79.375, -5.499261314), (81.699261314, -3.175))
            Line((81.699261314, -3.175), (76.2, -3.175))
        make_face()
        with BuildLine():
            Line((127, 6.35), (76.2, 6.35))
            ThreePointArc((76.2, 6.35), (79.375, 5.499261314), (81.699261314, 3.175))
            Line((81.699261314, 3.175), (121.500738686, 3.175))
            ThreePointArc((121.500738686, 3.175), (123.825, 5.499261314), (127, 6.35))
        make_face()
        with BuildLine():
            ThreePointArc((132.499261314, 3.175), (130.175, 5.499261314), (127, 6.35))
            ThreePointArc((127, 6.35), (123.825, 5.499261314), (121.500738686, 3.175))
            Line((121.500738686, 3.175), (127, 3.175))
            Line((127, 3.175), (132.499261314, 3.175))
        make_face()
        with BuildLine():
            Line((152.4, 6.35), (127, 6.35))
            ThreePointArc((127, 6.35), (130.175, 5.499261314), (132.499261314, 3.175))
            Line((132.499261314, 3.175), (146.900738686, 3.175))
            ThreePointArc((146.900738686, 3.175), (149.225, 5.499261314), (152.4, 6.35))
        make_face()
        with BuildLine():
            ThreePointArc((158.75, 0), (156.8901280605, 4.4901280605), (152.4, 6.35))
            ThreePointArc((152.4, 6.35), (149.225, 5.499261314), (146.900738686, 3.175))
            Line((146.900738686, 3.175), (152.4, 3.175))
            ThreePointArc((152.4, 3.175), (154.6450640303, 2.2450640303), (155.575, 0))
            ThreePointArc((155.575, 0), (154.6450640303, -2.2450640303), (152.4, -3.175))
            Line((152.4, -3.175), (146.900738686, -3.175))
            ThreePointArc((146.900738686, -3.175), (149.225, -5.499261314), (152.4, -6.35))
            ThreePointArc((152.4, -6.35), (156.8901280605, -4.4901280605), (158.75, 0))
        make_face()
        with BuildLine():
            ThreePointArc((132.499261314, -3.175), (130.175, -5.499261314), (127, -6.35))
            Line((127, -6.35), (152.4, -6.35))
            ThreePointArc((152.4, -6.35), (149.225, -5.499261314), (146.900738686, -3.175))
            Line((146.900738686, -3.175), (132.499261314, -3.175))
        make_face()
        with BuildLine():
            ThreePointArc((121.500738686, -3.175), (123.825, -5.499261314), (127, -6.35))
            ThreePointArc((127, -6.35), (130.175, -5.499261314), (132.499261314, -3.175))
            Line((132.499261314, -3.175), (127, -3.175))
            Line((127, -3.175), (121.500738686, -3.175))
        make_face()
        with BuildLine():
            ThreePointArc((81.699261314, -3.175), (79.375, -5.499261314), (76.2, -6.35))
            Line((76.2, -6.35), (127, -6.35))
            ThreePointArc((127, -6.35), (123.825, -5.499261314), (121.500738686, -3.175))
            Line((121.500738686, -3.175), (81.699261314, -3.175))
        make_face()
    extrude(amount=F4_DEPTH)


with BuildPart() as f5:
    # F0 (on Top) → F5 (new body)
    with BuildSketch(Plane.XY):
        Circle(F0_R)
    extrude(amount=F5_DEPTH)


solid = Compound([f1.part, f2.part, f3.part, f4.part, f5.part])
